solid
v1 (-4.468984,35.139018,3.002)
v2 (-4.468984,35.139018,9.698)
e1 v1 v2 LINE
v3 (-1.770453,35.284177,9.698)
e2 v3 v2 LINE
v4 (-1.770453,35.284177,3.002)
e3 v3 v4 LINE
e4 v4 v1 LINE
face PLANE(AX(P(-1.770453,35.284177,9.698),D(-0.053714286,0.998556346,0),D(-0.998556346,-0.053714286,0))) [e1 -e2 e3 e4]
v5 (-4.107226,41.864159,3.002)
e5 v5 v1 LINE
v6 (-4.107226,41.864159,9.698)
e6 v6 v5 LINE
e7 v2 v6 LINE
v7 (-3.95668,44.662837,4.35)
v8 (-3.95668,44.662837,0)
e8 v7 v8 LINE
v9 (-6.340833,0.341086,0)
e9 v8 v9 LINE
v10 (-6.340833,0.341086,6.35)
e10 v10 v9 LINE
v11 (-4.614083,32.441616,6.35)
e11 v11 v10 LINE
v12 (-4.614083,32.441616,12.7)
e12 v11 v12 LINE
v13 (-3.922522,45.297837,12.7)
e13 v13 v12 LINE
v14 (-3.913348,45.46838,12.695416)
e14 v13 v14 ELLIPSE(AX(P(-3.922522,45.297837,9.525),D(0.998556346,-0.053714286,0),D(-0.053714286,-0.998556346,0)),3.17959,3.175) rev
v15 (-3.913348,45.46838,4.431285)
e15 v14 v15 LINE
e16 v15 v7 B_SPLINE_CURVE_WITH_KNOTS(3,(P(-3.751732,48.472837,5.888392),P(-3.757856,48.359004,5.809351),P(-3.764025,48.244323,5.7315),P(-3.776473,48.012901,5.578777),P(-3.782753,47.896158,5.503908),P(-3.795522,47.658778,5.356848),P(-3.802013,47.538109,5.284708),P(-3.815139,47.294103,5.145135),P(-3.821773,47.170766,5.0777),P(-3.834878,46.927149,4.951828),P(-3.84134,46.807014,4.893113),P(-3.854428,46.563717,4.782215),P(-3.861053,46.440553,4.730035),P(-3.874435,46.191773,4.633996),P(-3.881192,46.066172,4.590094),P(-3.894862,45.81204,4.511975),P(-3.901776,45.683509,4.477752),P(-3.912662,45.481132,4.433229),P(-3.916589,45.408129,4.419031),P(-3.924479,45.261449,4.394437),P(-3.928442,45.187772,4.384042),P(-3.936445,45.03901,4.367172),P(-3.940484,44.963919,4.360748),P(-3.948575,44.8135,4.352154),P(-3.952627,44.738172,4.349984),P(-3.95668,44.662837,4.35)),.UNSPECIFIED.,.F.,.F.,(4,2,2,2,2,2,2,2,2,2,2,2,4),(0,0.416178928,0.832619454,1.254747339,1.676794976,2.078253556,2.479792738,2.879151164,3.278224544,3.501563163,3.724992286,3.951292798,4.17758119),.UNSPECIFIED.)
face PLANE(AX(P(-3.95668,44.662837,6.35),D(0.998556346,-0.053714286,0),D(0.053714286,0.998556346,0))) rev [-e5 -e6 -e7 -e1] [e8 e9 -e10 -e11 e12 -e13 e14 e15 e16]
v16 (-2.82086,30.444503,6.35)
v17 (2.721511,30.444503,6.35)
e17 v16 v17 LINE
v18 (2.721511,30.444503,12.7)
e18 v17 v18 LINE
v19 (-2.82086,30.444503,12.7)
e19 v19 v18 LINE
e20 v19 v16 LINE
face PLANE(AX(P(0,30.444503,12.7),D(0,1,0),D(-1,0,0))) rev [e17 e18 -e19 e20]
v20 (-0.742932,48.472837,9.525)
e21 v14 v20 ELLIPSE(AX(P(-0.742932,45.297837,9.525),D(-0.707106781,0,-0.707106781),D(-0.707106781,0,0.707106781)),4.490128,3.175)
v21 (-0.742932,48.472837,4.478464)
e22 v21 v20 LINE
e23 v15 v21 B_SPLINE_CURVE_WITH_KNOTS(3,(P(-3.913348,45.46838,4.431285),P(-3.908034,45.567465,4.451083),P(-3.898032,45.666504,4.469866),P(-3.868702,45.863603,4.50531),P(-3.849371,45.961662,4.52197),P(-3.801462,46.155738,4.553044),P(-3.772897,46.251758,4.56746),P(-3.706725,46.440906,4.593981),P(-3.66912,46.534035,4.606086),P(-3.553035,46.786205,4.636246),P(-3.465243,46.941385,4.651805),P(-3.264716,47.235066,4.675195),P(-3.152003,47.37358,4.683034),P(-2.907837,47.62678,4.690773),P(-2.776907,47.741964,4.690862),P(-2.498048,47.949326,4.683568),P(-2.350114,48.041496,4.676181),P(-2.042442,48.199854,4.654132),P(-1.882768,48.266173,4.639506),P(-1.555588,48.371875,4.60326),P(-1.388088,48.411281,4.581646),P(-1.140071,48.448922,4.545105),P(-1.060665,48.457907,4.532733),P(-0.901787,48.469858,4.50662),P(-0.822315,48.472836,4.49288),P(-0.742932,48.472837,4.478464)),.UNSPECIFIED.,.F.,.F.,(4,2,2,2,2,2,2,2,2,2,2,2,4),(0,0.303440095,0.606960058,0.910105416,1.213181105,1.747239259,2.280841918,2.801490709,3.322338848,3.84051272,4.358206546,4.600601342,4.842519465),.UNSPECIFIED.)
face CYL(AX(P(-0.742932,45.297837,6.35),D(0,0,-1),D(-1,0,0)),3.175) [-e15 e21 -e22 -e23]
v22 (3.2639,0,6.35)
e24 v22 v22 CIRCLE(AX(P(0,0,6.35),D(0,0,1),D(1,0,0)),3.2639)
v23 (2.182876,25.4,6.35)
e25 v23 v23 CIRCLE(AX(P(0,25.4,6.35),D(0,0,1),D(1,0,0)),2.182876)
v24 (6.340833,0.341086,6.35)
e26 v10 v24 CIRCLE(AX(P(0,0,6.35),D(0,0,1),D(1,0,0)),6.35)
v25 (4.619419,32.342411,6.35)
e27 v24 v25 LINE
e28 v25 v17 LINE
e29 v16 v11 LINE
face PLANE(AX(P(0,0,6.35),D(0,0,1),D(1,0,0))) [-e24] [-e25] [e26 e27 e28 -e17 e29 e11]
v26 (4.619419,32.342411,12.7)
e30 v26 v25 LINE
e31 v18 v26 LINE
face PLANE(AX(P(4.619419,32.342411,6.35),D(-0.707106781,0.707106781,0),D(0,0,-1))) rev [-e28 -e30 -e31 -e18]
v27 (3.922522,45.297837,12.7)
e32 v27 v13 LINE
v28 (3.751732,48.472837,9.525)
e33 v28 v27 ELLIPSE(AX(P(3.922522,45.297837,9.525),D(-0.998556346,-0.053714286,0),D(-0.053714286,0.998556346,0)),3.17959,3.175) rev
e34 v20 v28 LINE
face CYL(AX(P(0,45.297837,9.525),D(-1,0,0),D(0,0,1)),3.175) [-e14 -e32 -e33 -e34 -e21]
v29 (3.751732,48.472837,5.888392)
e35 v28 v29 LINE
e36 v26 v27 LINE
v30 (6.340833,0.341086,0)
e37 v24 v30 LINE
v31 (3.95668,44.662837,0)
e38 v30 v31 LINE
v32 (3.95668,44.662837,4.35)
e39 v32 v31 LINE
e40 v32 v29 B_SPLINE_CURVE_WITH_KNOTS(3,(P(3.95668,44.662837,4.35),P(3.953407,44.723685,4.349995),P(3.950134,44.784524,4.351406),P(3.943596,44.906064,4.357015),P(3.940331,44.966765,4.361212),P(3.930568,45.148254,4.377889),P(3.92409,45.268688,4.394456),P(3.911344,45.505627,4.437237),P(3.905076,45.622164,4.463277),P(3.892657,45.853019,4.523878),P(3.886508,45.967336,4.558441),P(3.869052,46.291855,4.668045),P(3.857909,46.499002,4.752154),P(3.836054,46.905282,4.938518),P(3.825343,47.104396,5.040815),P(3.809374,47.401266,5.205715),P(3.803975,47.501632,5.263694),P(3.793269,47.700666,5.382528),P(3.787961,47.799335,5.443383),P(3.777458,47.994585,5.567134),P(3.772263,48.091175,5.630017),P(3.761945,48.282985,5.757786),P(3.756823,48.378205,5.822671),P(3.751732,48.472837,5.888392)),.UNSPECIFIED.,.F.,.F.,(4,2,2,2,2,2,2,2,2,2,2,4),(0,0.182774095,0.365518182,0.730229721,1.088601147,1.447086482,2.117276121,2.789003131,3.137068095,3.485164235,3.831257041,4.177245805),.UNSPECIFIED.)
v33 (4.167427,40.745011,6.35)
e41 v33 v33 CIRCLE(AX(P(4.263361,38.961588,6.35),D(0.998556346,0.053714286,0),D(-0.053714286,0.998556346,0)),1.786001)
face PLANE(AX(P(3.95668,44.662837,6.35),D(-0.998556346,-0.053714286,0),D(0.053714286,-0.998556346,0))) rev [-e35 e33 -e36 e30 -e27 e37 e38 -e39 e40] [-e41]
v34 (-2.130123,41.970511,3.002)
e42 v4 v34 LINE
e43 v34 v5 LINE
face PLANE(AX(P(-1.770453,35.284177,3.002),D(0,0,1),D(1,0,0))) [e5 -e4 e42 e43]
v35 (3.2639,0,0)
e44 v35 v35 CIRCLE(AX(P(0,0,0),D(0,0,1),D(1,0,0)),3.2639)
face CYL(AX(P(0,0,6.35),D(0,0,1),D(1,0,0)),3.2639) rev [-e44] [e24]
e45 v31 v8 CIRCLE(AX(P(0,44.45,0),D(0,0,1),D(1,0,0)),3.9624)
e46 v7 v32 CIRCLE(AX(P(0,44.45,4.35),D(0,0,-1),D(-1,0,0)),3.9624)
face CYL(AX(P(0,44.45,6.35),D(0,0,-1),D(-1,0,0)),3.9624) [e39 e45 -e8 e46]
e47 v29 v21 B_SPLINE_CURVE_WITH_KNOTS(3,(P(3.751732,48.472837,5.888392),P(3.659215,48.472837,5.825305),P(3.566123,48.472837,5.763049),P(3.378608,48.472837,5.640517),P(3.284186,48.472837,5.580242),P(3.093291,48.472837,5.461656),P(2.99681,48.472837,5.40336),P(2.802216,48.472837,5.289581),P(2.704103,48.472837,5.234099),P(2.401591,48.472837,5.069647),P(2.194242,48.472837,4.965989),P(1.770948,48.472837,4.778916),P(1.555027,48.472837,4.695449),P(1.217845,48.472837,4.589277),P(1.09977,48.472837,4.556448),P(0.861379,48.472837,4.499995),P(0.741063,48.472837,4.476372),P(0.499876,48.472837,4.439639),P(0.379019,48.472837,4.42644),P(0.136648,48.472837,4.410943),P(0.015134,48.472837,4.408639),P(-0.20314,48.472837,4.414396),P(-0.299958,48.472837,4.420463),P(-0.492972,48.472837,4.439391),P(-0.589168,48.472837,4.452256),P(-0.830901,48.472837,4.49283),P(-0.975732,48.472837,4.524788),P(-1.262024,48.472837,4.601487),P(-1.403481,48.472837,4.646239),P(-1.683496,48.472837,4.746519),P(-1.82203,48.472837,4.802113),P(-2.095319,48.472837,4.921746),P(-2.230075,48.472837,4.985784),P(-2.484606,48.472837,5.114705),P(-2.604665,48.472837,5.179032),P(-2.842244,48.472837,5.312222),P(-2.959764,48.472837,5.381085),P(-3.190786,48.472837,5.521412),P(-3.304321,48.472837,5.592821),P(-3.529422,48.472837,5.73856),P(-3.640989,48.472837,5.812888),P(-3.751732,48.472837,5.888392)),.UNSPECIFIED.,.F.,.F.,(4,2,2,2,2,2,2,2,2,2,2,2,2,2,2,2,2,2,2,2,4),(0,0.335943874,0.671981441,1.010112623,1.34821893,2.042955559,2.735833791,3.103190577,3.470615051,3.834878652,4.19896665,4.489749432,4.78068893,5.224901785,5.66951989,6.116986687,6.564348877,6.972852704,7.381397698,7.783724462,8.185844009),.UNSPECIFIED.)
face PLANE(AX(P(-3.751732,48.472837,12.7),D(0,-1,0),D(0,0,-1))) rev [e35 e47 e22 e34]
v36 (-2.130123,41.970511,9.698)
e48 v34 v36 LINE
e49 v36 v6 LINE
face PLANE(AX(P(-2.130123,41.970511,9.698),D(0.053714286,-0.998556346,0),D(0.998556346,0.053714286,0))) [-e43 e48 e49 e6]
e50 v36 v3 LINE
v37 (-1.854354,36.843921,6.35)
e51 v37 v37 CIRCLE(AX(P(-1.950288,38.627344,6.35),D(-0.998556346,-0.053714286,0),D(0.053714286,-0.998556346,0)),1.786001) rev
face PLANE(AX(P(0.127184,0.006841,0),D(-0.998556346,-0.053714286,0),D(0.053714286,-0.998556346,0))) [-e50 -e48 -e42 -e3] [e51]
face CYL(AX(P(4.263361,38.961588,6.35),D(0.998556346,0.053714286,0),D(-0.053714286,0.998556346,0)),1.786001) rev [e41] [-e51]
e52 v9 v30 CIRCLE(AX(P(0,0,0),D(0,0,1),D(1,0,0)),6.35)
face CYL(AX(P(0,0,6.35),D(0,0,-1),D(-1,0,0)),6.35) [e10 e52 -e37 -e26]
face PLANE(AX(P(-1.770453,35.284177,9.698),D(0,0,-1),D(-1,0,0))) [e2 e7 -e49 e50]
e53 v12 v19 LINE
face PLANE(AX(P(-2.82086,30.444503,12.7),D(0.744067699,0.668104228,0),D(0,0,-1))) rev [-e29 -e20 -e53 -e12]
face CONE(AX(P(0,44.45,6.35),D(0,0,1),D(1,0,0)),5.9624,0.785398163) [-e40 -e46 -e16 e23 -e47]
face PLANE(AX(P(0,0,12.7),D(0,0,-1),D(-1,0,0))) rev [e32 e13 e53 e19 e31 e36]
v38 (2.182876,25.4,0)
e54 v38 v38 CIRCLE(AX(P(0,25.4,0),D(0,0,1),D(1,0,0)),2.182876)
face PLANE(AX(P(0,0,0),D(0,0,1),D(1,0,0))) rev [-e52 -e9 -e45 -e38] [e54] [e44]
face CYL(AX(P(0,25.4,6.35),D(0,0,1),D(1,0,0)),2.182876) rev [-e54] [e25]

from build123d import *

# Parameters (mm, degrees)
BOSS_EXTRUDE1_DEPTH              = 6.35
F_0_257_DIAMETER_HOLE1_D         = 6.5278
F_11_64_0_17188_DIAMETER_HOLE2_D = 4.365752
BOSS_EXTRUDE2_DEPTH              = 6.35
CHAMFER1_SIZE                    = 2
CHAMFER1_SIZE_2                  = 1.900651734
F_9_64_0_14063_DIAMETER_HOLE3_D  = 3.572002
CUT_EXTRUDE6_DEPTH               = 1.27
CUT_EXTRUDE6_DEPTH_BACK          = 3.175
SKETCH37_W                       = 6.696
SKETCH37_H                       = 6.696
FILLET2_R                        = 3.175


with BuildPart() as part:
    # Sketch1 → Boss-Extrude1 (new body)
    with BuildSketch(Plane.XY):
        with BuildLine():
            Line((3.956679664, 44.662837486), (6.340832795, 0.341085714))
            ThreePointArc((6.340832795, 0.341085714), (0, -6.35), (-6.340832795, 0.341085714))
            Line((-6.340832795, 0.341085714), (-3.956679664, 44.662837486))
            ThreePointArc((-3.956679664, 44.662837486), (0, 48.4124), (3.956679664, 44.662837486))
        make_face()
    extrude(amount=BOSS_EXTRUDE1_DEPTH)

    # F (0.257) Diameter Hole1 (through all)
    with Locations(Plane.XY.offset(6.35)):
        with Locations((0, 0)):
            Hole(F_0_257_DIAMETER_HOLE1_D / 2)

    # 11/64 (0.17188) Diameter Hole2 (through all)
    with Locations(Plane.XY.offset(6.35)):
        with Locations((0, 25.4)):
            Hole(F_11_64_0_17188_DIAMETER_HOLE2_D / 2)

    # Sketch8 → Boss-Extrude2 (add)
    with BuildSketch(Plane.XY.offset(6.35)):
        Polygon((4.48049686, 34.925), (3.956679664, 44.662837486), (3.751732363, 48.472837486), (-3.751732363, 48.472837486), (-3.956679664, 44.662837486), (-4.48049686, 34.925), (-4.72151149, 30.44450314), (0, 30.44450314), (4.72151149, 30.44450314), align=None)
    extrude(amount=BOSS_EXTRUDE2_DEPTH)

    # Chamfer1
    # the kernel refuses this chamfer: 2, 1.900651734 mm, written as the material it adds along each edge
    with BuildSketch(Plane(origin=(0, 44.45, 6.35), x_dir=(-0.31887891485273423, -0.9477954619338197, 0), z_dir=(0.9477954619338197, -0.31887891485273423, 0))) as chamfer1_piece_1_section:
        Polygon((3.9624, CHAMFER1_SIZE), (3.9624 + CHAMFER1_SIZE, 0), (3.9624, 0), align=None)
    chamfer1_piece_1 = revolve(axis=Axis((0, 44.45, 6.35), (0, 0, -1)), revolution_arc=322.809720089, mode=Mode.PRIVATE)
    chamfer1_piece_1 = split(chamfer1_piece_1, bisect_by=Plane(origin=(-3.847302471, 46.696175344, 4.621548789), z_dir=(0.9985563456862132, -0.05371428571428559, 0)), keep=Keep.TOP, mode=Mode.PRIVATE)
    chamfer1_piece_1 = split(chamfer1_piece_1, bisect_by=Plane(origin=(3.826743256, 47.078374128, 4.621548789), z_dir=(-0.9985563456862132, -0.05371428571428527, 0)), keep=Keep.TOP, mode=Mode.PRIVATE)
    chamfer1_piece_1 = split(chamfer1_piece_1, bisect_by=Plane(origin=(-3.562844962, 48.472837486, 4.621548789), z_dir=(0, -1, 0)), keep=Keep.TOP, mode=Mode.PRIVATE)
    add(chamfer1_piece_1)
    # the kernel refuses this chamfer: 2, 1.900651734 mm, written as the material it takes off along each edge
    with BuildSketch(Plane(origin=(-4.72151149, 30.44450314, 6.35), x_dir=(0.026237795181529237, 0.9996557297910176, 0), z_dir=(0, 0, 1))) as chamfer1_2_piece_1:
        Polygon((CHAMFER1_SIZE * 0.999621916911, -CHAMFER1_SIZE * 0.0274958766106), (CHAMFER1_SIZE_2 * 0.0262377951788, -CHAMFER1_SIZE_2 * 0.999655729687), (0, 0), align=None)
    extrude(amount=11.493365976, mode=Mode.SUBTRACT)
    with BuildSketch(Plane(origin=(4.72151149, 30.44450314, 6.35), x_dir=(-0.023285655605869076, 0.9997288523609813, 0), z_dir=(0, 0, 1))) as chamfer1_2_piece_2:
        Polygon((CHAMFER1_SIZE_2 * 0.999536361745, CHAMFER1_SIZE_2 * 0.0304476820407), (CHAMFER1_SIZE * 0.0232856556059, CHAMFER1_SIZE * 0.999728852361), (0, 0), align=None)
    extrude(amount=11.493365976, mode=Mode.SUBTRACT)

    # 9/64 (0.14063) Diameter Hole3 (through all)
    with Locations(Plane(origin=(6.340832795, 0.341085714, 0), x_dir=(0, 0, -1), z_dir=(0.9985563456862132, 0.05371428571428528, 0))):
        with Locations((-6.35, 38.676337841)):
            Hole(F_9_64_0_14063_DIAMETER_HOLE3_D / 2)

    # Sketch37 → Cut-Extrude6 (cut, two sides: drawn at the far end of the back side and taken through both)
    with BuildSketch(Plane(origin=(-1.14098275, -0.061375679, 0), x_dir=(0, 0, -1), z_dir=(0.9985563456862132, 0.05371428571428528, 0)).offset(-CUT_EXTRUDE6_DEPTH_BACK)):
        with Locations((-6.35, 38.676337841)):
            Rectangle(SKETCH37_W, SKETCH37_H)
    extrude(amount=CUT_EXTRUDE6_DEPTH + CUT_EXTRUDE6_DEPTH_BACK, mode=Mode.SUBTRACT)

    # Fillet2
    fillet2_edges = [part.edges().sort_by_distance(p)[0] for p in [
        (-3.751732363, 48.472837486, 9.294196206),
        (0, 48.472837486, 12.7),
    ]]
    fillet(fillet2_edges, radius=FILLET2_R)


solid = part.part
